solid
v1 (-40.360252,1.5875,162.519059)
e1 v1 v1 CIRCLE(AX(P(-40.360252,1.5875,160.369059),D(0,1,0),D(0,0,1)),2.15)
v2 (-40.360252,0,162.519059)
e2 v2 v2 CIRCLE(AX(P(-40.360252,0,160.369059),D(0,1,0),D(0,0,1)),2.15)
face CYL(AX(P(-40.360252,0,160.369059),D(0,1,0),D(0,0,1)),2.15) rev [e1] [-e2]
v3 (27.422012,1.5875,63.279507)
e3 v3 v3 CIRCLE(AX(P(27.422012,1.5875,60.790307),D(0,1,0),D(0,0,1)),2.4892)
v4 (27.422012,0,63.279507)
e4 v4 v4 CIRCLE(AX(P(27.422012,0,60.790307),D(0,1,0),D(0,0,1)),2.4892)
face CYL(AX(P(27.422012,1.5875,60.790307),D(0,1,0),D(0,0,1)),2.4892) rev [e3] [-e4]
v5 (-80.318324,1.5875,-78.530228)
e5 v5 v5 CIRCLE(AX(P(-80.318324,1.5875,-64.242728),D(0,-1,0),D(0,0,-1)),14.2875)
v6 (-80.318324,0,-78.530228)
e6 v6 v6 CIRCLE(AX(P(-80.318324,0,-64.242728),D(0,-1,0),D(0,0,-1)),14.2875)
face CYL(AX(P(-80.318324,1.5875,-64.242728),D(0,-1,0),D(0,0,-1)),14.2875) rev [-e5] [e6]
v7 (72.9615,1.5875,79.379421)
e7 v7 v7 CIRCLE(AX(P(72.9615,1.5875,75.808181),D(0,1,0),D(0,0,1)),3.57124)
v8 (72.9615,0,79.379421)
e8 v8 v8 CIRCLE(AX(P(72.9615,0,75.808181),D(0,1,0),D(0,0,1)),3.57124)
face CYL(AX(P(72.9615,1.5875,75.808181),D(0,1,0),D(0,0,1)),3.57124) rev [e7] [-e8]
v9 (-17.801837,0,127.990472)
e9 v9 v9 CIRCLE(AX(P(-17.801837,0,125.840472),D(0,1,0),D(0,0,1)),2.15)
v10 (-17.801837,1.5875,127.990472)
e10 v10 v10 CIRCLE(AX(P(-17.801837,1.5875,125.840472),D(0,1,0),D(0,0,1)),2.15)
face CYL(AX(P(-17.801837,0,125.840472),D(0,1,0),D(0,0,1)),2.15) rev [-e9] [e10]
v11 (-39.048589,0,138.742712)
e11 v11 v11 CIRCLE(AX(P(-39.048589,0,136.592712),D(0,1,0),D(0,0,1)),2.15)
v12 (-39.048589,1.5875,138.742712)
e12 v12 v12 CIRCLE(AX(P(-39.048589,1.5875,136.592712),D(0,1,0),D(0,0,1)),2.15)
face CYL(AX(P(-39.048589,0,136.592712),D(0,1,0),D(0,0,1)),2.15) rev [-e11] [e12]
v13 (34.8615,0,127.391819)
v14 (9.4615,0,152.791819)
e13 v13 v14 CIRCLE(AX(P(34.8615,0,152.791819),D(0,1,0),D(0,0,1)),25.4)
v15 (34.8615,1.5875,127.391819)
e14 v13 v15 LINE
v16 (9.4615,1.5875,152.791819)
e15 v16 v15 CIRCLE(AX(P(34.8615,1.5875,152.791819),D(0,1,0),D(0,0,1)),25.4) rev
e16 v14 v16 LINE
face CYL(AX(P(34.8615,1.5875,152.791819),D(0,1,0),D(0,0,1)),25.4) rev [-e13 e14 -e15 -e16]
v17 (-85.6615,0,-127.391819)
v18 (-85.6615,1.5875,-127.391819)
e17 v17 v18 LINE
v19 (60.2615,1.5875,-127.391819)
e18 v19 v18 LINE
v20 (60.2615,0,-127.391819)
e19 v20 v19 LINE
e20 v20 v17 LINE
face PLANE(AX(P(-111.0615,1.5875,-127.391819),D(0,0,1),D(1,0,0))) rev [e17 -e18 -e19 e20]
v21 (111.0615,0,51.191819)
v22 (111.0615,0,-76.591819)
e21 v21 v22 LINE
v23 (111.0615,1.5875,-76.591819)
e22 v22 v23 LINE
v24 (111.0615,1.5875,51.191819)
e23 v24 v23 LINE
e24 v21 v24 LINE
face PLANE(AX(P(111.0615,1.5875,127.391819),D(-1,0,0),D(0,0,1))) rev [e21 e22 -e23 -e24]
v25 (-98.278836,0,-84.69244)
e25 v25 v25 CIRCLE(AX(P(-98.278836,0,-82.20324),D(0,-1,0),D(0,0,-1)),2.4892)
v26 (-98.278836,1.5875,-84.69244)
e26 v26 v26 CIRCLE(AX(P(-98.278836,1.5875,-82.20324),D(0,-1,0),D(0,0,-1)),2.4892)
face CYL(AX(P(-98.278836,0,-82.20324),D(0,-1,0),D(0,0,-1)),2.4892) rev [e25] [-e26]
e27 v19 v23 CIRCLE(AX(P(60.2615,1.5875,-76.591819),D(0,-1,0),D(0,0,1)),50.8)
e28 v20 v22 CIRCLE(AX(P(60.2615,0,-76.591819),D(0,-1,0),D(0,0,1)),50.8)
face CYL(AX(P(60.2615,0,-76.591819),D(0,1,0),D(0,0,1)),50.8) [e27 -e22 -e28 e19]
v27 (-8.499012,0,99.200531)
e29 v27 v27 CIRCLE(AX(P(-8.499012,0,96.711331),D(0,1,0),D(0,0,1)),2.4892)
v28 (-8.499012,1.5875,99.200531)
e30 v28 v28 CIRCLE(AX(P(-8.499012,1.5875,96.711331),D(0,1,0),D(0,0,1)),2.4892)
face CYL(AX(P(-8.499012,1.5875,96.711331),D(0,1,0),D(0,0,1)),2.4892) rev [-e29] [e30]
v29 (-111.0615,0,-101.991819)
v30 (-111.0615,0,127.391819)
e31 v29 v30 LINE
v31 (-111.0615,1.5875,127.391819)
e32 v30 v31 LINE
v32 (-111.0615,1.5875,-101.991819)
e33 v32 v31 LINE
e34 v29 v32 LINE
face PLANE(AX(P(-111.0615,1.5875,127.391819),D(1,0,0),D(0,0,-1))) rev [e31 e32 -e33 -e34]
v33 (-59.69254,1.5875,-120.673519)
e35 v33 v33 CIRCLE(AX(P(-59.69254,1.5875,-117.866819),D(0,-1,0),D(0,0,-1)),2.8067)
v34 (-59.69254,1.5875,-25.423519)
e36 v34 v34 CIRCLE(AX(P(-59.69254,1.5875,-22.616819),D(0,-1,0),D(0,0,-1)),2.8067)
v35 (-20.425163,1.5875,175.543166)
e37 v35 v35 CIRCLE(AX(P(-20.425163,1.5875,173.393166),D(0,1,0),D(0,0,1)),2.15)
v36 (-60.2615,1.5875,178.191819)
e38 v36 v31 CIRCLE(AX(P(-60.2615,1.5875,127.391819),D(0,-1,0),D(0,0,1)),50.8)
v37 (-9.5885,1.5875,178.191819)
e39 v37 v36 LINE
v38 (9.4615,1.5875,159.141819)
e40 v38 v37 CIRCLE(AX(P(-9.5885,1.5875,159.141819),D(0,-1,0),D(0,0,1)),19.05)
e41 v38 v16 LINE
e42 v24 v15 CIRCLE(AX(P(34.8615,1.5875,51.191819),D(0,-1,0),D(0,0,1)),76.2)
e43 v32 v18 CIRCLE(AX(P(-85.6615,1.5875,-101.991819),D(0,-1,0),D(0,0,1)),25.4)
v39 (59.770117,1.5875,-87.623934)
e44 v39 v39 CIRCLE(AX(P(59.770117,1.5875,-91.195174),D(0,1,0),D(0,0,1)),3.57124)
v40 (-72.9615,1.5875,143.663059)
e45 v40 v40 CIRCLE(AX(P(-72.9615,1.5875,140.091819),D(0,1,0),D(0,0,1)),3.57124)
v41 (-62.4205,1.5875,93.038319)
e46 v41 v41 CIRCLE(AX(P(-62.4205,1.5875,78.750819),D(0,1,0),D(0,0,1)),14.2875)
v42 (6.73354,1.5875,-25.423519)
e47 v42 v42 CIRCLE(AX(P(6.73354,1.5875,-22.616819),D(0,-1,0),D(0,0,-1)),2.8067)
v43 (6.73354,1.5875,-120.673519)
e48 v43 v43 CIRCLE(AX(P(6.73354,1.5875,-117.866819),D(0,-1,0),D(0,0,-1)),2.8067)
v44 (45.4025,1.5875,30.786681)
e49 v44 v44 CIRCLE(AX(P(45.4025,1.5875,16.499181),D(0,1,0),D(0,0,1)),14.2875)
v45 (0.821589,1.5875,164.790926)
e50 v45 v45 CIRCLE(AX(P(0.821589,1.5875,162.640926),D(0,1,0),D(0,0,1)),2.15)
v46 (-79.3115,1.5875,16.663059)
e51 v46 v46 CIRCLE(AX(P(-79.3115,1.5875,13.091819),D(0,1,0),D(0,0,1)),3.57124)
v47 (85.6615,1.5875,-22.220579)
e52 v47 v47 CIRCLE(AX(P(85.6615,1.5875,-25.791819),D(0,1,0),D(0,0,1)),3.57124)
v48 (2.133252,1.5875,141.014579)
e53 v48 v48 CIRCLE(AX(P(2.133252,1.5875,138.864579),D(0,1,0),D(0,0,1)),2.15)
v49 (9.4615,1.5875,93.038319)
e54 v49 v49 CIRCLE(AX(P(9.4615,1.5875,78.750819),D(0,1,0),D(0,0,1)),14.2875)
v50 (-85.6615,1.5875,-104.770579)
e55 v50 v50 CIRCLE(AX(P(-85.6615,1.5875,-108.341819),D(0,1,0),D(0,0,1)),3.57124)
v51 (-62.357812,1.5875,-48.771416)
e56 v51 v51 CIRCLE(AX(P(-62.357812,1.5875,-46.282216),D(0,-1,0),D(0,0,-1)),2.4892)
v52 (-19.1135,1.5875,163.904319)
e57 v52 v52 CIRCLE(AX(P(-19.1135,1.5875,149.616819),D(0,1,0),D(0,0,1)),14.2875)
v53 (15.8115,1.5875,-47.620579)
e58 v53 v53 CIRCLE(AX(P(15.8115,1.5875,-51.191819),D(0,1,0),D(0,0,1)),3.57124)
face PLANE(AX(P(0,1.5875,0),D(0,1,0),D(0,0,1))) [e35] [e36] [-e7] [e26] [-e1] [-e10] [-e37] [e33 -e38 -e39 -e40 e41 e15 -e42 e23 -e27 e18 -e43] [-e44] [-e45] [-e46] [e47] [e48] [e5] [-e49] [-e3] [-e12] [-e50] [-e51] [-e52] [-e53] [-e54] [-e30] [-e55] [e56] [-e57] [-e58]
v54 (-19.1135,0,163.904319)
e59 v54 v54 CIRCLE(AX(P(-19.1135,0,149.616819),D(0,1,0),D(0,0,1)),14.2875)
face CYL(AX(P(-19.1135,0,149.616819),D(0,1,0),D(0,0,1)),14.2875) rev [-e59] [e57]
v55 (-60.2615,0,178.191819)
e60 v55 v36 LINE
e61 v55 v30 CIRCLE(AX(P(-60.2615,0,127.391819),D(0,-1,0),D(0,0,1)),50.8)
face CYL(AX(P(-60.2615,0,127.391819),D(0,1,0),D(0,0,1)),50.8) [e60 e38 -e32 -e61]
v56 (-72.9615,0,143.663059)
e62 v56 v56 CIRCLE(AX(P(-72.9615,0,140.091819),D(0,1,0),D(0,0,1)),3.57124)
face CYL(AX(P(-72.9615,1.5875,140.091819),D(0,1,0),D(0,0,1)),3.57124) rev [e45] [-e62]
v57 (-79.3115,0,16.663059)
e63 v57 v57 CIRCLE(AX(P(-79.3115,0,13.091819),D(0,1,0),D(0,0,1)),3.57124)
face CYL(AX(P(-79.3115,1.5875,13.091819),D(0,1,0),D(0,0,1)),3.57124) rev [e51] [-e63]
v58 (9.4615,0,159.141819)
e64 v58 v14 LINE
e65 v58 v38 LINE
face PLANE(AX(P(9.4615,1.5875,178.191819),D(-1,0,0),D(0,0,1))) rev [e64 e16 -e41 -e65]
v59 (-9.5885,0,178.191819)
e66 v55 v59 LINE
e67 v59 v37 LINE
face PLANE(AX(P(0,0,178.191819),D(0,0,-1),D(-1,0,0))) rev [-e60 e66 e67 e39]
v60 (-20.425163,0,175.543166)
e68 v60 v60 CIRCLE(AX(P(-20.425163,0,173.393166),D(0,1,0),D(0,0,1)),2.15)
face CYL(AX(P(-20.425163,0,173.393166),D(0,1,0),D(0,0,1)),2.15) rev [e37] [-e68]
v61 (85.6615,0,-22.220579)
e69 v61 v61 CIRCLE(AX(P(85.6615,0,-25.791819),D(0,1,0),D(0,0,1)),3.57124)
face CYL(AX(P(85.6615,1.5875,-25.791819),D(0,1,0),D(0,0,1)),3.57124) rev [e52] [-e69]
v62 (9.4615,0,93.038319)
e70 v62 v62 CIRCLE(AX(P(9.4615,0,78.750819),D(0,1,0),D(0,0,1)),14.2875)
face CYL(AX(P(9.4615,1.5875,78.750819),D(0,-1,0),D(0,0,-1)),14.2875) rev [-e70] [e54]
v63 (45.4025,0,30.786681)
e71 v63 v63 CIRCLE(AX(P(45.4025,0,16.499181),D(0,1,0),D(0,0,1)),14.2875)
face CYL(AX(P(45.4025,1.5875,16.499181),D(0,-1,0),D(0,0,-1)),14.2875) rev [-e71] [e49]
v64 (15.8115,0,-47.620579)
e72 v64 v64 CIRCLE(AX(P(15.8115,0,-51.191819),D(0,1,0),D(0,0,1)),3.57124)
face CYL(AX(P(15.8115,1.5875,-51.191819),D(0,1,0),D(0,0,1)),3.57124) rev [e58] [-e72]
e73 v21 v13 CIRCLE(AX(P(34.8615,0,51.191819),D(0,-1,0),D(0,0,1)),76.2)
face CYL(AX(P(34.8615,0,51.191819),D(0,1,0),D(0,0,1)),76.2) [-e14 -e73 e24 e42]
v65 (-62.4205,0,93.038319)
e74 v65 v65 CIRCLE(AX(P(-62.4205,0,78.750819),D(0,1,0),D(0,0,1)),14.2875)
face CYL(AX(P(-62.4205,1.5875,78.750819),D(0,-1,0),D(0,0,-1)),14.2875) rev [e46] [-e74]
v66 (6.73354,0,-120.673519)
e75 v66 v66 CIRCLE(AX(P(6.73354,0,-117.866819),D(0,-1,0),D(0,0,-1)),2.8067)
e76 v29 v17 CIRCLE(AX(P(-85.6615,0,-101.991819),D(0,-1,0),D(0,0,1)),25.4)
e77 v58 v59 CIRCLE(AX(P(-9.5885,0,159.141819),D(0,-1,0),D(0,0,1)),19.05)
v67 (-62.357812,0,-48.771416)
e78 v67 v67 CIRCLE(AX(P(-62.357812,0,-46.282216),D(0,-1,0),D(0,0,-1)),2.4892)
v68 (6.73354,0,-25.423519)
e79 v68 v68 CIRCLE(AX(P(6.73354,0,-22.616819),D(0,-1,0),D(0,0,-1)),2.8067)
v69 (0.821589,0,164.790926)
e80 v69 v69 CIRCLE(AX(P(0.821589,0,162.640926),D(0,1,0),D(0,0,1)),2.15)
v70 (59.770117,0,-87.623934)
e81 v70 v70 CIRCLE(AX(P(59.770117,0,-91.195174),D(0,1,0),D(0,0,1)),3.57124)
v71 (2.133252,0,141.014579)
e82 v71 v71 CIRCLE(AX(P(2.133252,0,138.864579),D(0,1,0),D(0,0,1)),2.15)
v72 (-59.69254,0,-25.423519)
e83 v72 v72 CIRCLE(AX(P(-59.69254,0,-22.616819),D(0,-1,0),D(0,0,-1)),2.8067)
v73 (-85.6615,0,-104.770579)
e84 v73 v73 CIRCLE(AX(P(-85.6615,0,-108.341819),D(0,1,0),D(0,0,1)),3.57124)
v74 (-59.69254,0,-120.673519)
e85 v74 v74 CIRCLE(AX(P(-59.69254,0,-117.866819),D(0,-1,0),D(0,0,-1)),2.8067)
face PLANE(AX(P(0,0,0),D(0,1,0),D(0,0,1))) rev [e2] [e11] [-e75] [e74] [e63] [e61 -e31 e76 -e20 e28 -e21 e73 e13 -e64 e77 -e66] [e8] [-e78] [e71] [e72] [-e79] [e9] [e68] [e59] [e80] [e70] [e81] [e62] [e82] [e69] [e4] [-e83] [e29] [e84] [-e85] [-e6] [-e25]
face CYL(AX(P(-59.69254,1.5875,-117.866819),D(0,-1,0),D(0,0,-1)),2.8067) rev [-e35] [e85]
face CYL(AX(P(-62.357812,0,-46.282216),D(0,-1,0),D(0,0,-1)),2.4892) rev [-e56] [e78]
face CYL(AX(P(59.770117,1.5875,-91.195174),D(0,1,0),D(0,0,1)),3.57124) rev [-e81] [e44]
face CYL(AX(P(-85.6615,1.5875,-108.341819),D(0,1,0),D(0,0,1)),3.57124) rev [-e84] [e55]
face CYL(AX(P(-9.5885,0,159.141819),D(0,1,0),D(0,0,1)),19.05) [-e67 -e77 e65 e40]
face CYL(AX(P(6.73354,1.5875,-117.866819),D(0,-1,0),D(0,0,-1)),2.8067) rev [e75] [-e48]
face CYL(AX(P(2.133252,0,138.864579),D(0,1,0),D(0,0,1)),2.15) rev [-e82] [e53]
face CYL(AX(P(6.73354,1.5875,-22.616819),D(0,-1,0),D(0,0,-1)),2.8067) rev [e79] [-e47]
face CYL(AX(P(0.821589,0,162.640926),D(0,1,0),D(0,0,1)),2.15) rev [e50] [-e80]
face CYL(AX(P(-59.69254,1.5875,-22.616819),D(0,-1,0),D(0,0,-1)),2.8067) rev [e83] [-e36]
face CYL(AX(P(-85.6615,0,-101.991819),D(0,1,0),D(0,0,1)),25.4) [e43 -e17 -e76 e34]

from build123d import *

# Parameters (mm, degrees)
SKETCH1_W               = 222.123
SKETCH1_H               = 254.783638074
SKETCH1_R               = 14.2875
SKETCH1_R_2             = 1.27
BOSS_EXTRUDE1_DEPTH     = 1.5875
F_10_CLEARANCE_HOLE1_D  = 4.9784
SKETCH4_R               = 2.8067
CUT_EXTRUDE1_DEPTH      = 170.014355888
SKETCH5_R               = 1.5875
CUT_EXTRUDE2_DEPTH      = 170.014355888
SKETCH6_W               = 222.123
SKETCH6_H               = 1.5875
BOSS_EXTRUDE2_DEPTH     = 50.8
SKETCH7_W               = 101.6
SKETCH7_H               = 50.8
CUT_EXTRUDE3_DEPTH      = 210.975001632
SKETCH8_R               = 14.2875
CUT_EXTRUDE5_DEPTH      = 210.975001632
SKETCH9_R               = 2.15
CUT_EXTRUDE6_DEPTH      = 210.975001632
SKETCH10_R              = 14.2875
SKETCH10_R_2            = 1.27
CUT_EXTRUDE7_DEPTH      = 210.975001632
F_10_CLEARANCE_HOLE2_D  = 4.9784
CUT_EXTRUDE8_DEPTH      = 210.975001632
CUT_EXTRUDE9_DEPTH      = 210.975001632
FILLET1_R               = 25.4
CUT_EXTRUDE10_DEPTH     = 210.975001632
CUT_EXTRUDE11_DEPTH     = 210.975001632
CUT_EXTRUDE13_DEPTH     = 210.975001632
SKETCH18_R              = 1.27
CUT_EXTRUDE14_DEPTH     = 210.975001632
F_1_4_CLEARANCE_HOLE1_D = 7.14248


with BuildPart() as part:
    # Sketch1 → Boss-Extrude1 (new body)
    with BuildSketch(Plane(origin=(0, 0, 0), x_dir=(1, 0, 0), z_dir=(0, 1, 0))):
        Rectangle(SKETCH1_W, SKETCH1_H)
        with Locations(Location((9.4615, -78.750819037, 0), (0, 0, 270))):
            Circle(SKETCH1_R, mode=Mode.SUBTRACT)
        with Locations(Location((45.4025, -16.499180963, 0), (0, 0, 270))):
            Circle(SKETCH1_R, mode=Mode.SUBTRACT)
        with Locations(Location((-62.4205, -78.750819037, 0), (0, 0, 270))):
            Circle(SKETCH1_R, mode=Mode.SUBTRACT)
        with Locations(Location((-8.499012242, -96.71133128, 0), (0, 0, 270))):
            Circle(SKETCH1_R_2, mode=Mode.SUBTRACT)
        with Locations(Location((27.422012242, -60.790306795, 0), (0, 0, 270))):
            Circle(SKETCH1_R_2, mode=Mode.SUBTRACT)
    extrude(amount=BOSS_EXTRUDE1_DEPTH)

    # #10 Clearance Hole1 (through all)
    with Locations(Plane(origin=(0, 1.5875, 0), x_dir=(1, 0, 0), z_dir=(0, 1, 0))):
        with Locations((-8.499012242, -96.71133128), (27.422012242, -60.790306795)):
            Hole(F_10_CLEARANCE_HOLE1_D / 2)

    # Sketch4 → Cut-Extrude1 (cut, through all)
    with BuildSketch(Plane(origin=(0, 0, 0), x_dir=(-1, 0, 0), z_dir=(0, -1, 0))):
        with Locations(Location((59.692539866, 117.866819037, 0), (0, 0, 90))):
            Circle(SKETCH4_R)
        with Locations(Location((59.692539866, 22.616819037, 0), (0, 0, 90))):
            Circle(SKETCH4_R)
        with Locations(Location((-6.733539866, 117.866819037, 0), (0, 0, 90))):
            Circle(SKETCH4_R)
        with Locations(Location((-6.733539866, 22.616819037, 0), (0, 0, 90))):
            Circle(SKETCH4_R)
    extrude(amount=-CUT_EXTRUDE1_DEPTH, mode=Mode.SUBTRACT)

    # Sketch5 → Cut-Extrude2 (cut, through all)
    with BuildSketch(Plane.XZ):
        with Locations(Location((59.770116522, -91.195174152, 0), (0, 0, 270))):
            Circle(SKETCH5_R)
    extrude(amount=-CUT_EXTRUDE2_DEPTH, mode=Mode.SUBTRACT)

    # Sketch6 → Boss-Extrude2 (add)
    with BuildSketch(Plane.XY.offset(127.391819037)):
        with Locations((0, 0.79375)):
            Rectangle(SKETCH6_W, SKETCH6_H)
    extrude(amount=BOSS_EXTRUDE2_DEPTH)

    # Sketch7 → Cut-Extrude3 (cut, through all)
    with BuildSketch(Plane(origin=(0, 0, 0), x_dir=(-1, 0, 0), z_dir=(0, -1, 0))):
        with Locations((-60.2615, -152.791819037)):
            Rectangle(SKETCH7_W, SKETCH7_H)
    extrude(amount=-CUT_EXTRUDE3_DEPTH, mode=Mode.SUBTRACT)

    # Sketch8 → Cut-Extrude5 (cut, through all)
    with BuildSketch(Plane(origin=(0, 1.5875, 0), x_dir=(1, 0, 0), z_dir=(0, 1, 0))):
        with Locations(Location((-19.1135, -149.616819037, 0), (0, 0, 270))):
            Circle(SKETCH8_R)
    extrude(amount=-CUT_EXTRUDE5_DEPTH, mode=Mode.SUBTRACT)

    # Sketch9 → Cut-Extrude6 (cut, through all)
    with BuildSketch(Plane(origin=(0, 1.5875, 0), x_dir=(1, 0, 0), z_dir=(0, 1, 0))):
        with Locations(Location((-17.801836865, -125.840471629, 0), (0, 0, 270))):
            Circle(SKETCH9_R)
        with Locations(Location((2.133252432, -138.86457893, 0), (0, 0, 270))):
            Circle(SKETCH9_R)
        with Locations(Location((0.821589297, -162.640926338, 0), (0, 0, 270))):
            Circle(SKETCH9_R)
        with Locations(Location((-20.425163135, -173.393166445, 0), (0, 0, 270))):
            Circle(SKETCH9_R)
        with Locations(Location((-40.360252432, -160.369059145, 0), (0, 0, 270))):
            Circle(SKETCH9_R)
        with Locations(Location((-39.048589297, -136.592711737, 0), (0, 0, 270))):
            Circle(SKETCH9_R)
    extrude(amount=-CUT_EXTRUDE6_DEPTH, mode=Mode.SUBTRACT)

    # Sketch10 → Cut-Extrude7 (cut, through all)
    with BuildSketch(Plane(origin=(0, 0, 0), x_dir=(-1, 0, 0), z_dir=(0, -1, 0))):
        with Locations(Location((80.318324186, 64.242728022, 0), (0, 0, 90))):
            Circle(SKETCH10_R)
        with Locations(Location((62.357811944, 46.28221578, 0), (0, 0, 90))):
            Circle(SKETCH10_R_2)
        with Locations(Location((98.278836428, 82.203240264, 0), (0, 0, 90))):
            Circle(SKETCH10_R_2)
    extrude(amount=-CUT_EXTRUDE7_DEPTH, mode=Mode.SUBTRACT)

    # #10 Clearance Hole2 (through all)
    with Locations(Plane(origin=(0, 0, 0), x_dir=(-1, 0, 0), z_dir=(0, -1, 0))):
        with Locations((98.278836428, 82.203240264), (62.357811944, 46.28221578)):
            Hole(F_10_CLEARANCE_HOLE2_D / 2)

    # Sketch13 → Cut-Extrude8 (cut, through all)
    with BuildSketch(Plane(origin=(0, 1.5875, 0), x_dir=(1, 0, 0), z_dir=(0, 1, 0))):
        with BuildLine():
            Line((60.2615, 127.391819037), (111.0615, 127.391819037))
            Line((111.0615, 127.391819037), (111.0615, 76.591819037))
            ThreePointArc((111.0615, 76.591819037), (96.182524484, 112.512843522), (60.2615, 127.391819037))
        make_face()
    extrude(amount=-CUT_EXTRUDE8_DEPTH, mode=Mode.SUBTRACT)

    # Sketch14 → Cut-Extrude9 (cut, through all)
    with BuildSketch(Plane(origin=(0, 1.5875, 0), x_dir=(1, 0, 0), z_dir=(0, 1, 0))):
        with BuildLine():
            Line((34.8615, -127.391819037), (111.0615, -127.391819037))
            Line((111.0615, -127.391819037), (111.0615, -51.191819037))
            ThreePointArc((111.0615, -51.191819037), (88.743036726, -105.073355764), (34.8615, -127.391819037))
        make_face()
    extrude(amount=-CUT_EXTRUDE9_DEPTH, mode=Mode.SUBTRACT)

    # Fillet1
    fillet1_edges = [part.edges().sort_by_distance(p)[0] for p in [
        (9.4615, 0.79375, 127.391819037),
    ]]
    fillet(fillet1_edges, radius=FILLET1_R - 0.0001)  # a hair under: the kernel refuses the full size

    # Sketch15 → Cut-Extrude10 (cut, through all)
    with BuildSketch(Plane(origin=(0, 1.5875, 0), x_dir=(1, 0, 0), z_dir=(0, 1, 0))):
        with BuildLine():
            Line((-111.0615, 101.991819037), (-111.0615, 127.391819037))
            Line((-111.0615, 127.391819037), (-85.6615, 127.391819037))
            ThreePointArc((-85.6615, 127.391819037), (-103.622012242, 119.95233128), (-111.0615, 101.991819037))
        make_face()
    extrude(amount=-CUT_EXTRUDE10_DEPTH, mode=Mode.SUBTRACT)

    # Sketch16 → Cut-Extrude11 (cut, through all)
    with BuildSketch(Plane(origin=(0, 1.5875, 0), x_dir=(1, 0, 0), z_dir=(0, 1, 0))):
        with BuildLine():
            Line((-111.0615, -127.391819037), (-111.0615, -178.191819037))
            Line((-111.0615, -178.191819037), (-60.2615, -178.191819037))
            ThreePointArc((-60.2615, -178.191819037), (-96.182524484, -163.312843522), (-111.0615, -127.391819037))
        make_face()
    extrude(amount=-CUT_EXTRUDE11_DEPTH, mode=Mode.SUBTRACT)

    # Sketch17 → Cut-Extrude13 (cut, through all)
    with BuildSketch(Plane(origin=(0, 1.5875, 0), x_dir=(1, 0, 0), z_dir=(0, 1, 0))):
        with BuildLine():
            Line((9.4615, -178.191819037), (9.4615, -159.141819037))
            ThreePointArc((9.4615, -159.141819037), (3.881884182, -172.612203219), (-9.5885, -178.191819037))
            Line((-9.5885, -178.191819037), (9.4615, -178.191819037))
        make_face()
    extrude(amount=-CUT_EXTRUDE13_DEPTH, mode=Mode.SUBTRACT)

    # Sketch18 → Cut-Extrude14 (cut, through all)
    with BuildSketch(Plane(origin=(0, 1.5875, 0), x_dir=(1, 0, 0), z_dir=(0, 1, 0))):
        with Locations(Location((72.9615, -75.808180963, 0), (0, 0, 270))):
            Circle(SKETCH18_R)
        with Locations(Location((85.6615, 25.791819037, 0), (0, 0, 270))):
            Circle(SKETCH18_R)
        with Locations(Location((15.8115, 51.191819037, 0), (0, 0, 270))):
            Circle(SKETCH18_R)
        with Locations(Location((-85.6615, 108.341819037, 0), (0, 0, 270))):
            Circle(SKETCH18_R)
        with Locations(Location((-79.3115, -13.091819037, 0), (0, 0, 270))):
            Circle(SKETCH18_R)
        with Locations(Location((-72.9615, -140.091819037, 0), (0, 0, 270))):
            Circle(SKETCH18_R)
    extrude(amount=-CUT_EXTRUDE14_DEPTH, mode=Mode.SUBTRACT)

    # 1/4 Clearance Hole1 (through all)
    with Locations(Plane(origin=(0, 1.5875, 0), x_dir=(1, 0, 0), z_dir=(0, 1, 0))):
        with Locations((-72.9615, -140.091819037), (72.9615, -75.808180963), (85.6615, 25.791819037), (15.8115, 51.191819037), (59.770116522, 91.195174152), (-79.3115, -13.091819037), (-85.6615, 108.341819037)):
            Hole(F_1_4_CLEARANCE_HOLE1_D / 2)


solid = part.part
